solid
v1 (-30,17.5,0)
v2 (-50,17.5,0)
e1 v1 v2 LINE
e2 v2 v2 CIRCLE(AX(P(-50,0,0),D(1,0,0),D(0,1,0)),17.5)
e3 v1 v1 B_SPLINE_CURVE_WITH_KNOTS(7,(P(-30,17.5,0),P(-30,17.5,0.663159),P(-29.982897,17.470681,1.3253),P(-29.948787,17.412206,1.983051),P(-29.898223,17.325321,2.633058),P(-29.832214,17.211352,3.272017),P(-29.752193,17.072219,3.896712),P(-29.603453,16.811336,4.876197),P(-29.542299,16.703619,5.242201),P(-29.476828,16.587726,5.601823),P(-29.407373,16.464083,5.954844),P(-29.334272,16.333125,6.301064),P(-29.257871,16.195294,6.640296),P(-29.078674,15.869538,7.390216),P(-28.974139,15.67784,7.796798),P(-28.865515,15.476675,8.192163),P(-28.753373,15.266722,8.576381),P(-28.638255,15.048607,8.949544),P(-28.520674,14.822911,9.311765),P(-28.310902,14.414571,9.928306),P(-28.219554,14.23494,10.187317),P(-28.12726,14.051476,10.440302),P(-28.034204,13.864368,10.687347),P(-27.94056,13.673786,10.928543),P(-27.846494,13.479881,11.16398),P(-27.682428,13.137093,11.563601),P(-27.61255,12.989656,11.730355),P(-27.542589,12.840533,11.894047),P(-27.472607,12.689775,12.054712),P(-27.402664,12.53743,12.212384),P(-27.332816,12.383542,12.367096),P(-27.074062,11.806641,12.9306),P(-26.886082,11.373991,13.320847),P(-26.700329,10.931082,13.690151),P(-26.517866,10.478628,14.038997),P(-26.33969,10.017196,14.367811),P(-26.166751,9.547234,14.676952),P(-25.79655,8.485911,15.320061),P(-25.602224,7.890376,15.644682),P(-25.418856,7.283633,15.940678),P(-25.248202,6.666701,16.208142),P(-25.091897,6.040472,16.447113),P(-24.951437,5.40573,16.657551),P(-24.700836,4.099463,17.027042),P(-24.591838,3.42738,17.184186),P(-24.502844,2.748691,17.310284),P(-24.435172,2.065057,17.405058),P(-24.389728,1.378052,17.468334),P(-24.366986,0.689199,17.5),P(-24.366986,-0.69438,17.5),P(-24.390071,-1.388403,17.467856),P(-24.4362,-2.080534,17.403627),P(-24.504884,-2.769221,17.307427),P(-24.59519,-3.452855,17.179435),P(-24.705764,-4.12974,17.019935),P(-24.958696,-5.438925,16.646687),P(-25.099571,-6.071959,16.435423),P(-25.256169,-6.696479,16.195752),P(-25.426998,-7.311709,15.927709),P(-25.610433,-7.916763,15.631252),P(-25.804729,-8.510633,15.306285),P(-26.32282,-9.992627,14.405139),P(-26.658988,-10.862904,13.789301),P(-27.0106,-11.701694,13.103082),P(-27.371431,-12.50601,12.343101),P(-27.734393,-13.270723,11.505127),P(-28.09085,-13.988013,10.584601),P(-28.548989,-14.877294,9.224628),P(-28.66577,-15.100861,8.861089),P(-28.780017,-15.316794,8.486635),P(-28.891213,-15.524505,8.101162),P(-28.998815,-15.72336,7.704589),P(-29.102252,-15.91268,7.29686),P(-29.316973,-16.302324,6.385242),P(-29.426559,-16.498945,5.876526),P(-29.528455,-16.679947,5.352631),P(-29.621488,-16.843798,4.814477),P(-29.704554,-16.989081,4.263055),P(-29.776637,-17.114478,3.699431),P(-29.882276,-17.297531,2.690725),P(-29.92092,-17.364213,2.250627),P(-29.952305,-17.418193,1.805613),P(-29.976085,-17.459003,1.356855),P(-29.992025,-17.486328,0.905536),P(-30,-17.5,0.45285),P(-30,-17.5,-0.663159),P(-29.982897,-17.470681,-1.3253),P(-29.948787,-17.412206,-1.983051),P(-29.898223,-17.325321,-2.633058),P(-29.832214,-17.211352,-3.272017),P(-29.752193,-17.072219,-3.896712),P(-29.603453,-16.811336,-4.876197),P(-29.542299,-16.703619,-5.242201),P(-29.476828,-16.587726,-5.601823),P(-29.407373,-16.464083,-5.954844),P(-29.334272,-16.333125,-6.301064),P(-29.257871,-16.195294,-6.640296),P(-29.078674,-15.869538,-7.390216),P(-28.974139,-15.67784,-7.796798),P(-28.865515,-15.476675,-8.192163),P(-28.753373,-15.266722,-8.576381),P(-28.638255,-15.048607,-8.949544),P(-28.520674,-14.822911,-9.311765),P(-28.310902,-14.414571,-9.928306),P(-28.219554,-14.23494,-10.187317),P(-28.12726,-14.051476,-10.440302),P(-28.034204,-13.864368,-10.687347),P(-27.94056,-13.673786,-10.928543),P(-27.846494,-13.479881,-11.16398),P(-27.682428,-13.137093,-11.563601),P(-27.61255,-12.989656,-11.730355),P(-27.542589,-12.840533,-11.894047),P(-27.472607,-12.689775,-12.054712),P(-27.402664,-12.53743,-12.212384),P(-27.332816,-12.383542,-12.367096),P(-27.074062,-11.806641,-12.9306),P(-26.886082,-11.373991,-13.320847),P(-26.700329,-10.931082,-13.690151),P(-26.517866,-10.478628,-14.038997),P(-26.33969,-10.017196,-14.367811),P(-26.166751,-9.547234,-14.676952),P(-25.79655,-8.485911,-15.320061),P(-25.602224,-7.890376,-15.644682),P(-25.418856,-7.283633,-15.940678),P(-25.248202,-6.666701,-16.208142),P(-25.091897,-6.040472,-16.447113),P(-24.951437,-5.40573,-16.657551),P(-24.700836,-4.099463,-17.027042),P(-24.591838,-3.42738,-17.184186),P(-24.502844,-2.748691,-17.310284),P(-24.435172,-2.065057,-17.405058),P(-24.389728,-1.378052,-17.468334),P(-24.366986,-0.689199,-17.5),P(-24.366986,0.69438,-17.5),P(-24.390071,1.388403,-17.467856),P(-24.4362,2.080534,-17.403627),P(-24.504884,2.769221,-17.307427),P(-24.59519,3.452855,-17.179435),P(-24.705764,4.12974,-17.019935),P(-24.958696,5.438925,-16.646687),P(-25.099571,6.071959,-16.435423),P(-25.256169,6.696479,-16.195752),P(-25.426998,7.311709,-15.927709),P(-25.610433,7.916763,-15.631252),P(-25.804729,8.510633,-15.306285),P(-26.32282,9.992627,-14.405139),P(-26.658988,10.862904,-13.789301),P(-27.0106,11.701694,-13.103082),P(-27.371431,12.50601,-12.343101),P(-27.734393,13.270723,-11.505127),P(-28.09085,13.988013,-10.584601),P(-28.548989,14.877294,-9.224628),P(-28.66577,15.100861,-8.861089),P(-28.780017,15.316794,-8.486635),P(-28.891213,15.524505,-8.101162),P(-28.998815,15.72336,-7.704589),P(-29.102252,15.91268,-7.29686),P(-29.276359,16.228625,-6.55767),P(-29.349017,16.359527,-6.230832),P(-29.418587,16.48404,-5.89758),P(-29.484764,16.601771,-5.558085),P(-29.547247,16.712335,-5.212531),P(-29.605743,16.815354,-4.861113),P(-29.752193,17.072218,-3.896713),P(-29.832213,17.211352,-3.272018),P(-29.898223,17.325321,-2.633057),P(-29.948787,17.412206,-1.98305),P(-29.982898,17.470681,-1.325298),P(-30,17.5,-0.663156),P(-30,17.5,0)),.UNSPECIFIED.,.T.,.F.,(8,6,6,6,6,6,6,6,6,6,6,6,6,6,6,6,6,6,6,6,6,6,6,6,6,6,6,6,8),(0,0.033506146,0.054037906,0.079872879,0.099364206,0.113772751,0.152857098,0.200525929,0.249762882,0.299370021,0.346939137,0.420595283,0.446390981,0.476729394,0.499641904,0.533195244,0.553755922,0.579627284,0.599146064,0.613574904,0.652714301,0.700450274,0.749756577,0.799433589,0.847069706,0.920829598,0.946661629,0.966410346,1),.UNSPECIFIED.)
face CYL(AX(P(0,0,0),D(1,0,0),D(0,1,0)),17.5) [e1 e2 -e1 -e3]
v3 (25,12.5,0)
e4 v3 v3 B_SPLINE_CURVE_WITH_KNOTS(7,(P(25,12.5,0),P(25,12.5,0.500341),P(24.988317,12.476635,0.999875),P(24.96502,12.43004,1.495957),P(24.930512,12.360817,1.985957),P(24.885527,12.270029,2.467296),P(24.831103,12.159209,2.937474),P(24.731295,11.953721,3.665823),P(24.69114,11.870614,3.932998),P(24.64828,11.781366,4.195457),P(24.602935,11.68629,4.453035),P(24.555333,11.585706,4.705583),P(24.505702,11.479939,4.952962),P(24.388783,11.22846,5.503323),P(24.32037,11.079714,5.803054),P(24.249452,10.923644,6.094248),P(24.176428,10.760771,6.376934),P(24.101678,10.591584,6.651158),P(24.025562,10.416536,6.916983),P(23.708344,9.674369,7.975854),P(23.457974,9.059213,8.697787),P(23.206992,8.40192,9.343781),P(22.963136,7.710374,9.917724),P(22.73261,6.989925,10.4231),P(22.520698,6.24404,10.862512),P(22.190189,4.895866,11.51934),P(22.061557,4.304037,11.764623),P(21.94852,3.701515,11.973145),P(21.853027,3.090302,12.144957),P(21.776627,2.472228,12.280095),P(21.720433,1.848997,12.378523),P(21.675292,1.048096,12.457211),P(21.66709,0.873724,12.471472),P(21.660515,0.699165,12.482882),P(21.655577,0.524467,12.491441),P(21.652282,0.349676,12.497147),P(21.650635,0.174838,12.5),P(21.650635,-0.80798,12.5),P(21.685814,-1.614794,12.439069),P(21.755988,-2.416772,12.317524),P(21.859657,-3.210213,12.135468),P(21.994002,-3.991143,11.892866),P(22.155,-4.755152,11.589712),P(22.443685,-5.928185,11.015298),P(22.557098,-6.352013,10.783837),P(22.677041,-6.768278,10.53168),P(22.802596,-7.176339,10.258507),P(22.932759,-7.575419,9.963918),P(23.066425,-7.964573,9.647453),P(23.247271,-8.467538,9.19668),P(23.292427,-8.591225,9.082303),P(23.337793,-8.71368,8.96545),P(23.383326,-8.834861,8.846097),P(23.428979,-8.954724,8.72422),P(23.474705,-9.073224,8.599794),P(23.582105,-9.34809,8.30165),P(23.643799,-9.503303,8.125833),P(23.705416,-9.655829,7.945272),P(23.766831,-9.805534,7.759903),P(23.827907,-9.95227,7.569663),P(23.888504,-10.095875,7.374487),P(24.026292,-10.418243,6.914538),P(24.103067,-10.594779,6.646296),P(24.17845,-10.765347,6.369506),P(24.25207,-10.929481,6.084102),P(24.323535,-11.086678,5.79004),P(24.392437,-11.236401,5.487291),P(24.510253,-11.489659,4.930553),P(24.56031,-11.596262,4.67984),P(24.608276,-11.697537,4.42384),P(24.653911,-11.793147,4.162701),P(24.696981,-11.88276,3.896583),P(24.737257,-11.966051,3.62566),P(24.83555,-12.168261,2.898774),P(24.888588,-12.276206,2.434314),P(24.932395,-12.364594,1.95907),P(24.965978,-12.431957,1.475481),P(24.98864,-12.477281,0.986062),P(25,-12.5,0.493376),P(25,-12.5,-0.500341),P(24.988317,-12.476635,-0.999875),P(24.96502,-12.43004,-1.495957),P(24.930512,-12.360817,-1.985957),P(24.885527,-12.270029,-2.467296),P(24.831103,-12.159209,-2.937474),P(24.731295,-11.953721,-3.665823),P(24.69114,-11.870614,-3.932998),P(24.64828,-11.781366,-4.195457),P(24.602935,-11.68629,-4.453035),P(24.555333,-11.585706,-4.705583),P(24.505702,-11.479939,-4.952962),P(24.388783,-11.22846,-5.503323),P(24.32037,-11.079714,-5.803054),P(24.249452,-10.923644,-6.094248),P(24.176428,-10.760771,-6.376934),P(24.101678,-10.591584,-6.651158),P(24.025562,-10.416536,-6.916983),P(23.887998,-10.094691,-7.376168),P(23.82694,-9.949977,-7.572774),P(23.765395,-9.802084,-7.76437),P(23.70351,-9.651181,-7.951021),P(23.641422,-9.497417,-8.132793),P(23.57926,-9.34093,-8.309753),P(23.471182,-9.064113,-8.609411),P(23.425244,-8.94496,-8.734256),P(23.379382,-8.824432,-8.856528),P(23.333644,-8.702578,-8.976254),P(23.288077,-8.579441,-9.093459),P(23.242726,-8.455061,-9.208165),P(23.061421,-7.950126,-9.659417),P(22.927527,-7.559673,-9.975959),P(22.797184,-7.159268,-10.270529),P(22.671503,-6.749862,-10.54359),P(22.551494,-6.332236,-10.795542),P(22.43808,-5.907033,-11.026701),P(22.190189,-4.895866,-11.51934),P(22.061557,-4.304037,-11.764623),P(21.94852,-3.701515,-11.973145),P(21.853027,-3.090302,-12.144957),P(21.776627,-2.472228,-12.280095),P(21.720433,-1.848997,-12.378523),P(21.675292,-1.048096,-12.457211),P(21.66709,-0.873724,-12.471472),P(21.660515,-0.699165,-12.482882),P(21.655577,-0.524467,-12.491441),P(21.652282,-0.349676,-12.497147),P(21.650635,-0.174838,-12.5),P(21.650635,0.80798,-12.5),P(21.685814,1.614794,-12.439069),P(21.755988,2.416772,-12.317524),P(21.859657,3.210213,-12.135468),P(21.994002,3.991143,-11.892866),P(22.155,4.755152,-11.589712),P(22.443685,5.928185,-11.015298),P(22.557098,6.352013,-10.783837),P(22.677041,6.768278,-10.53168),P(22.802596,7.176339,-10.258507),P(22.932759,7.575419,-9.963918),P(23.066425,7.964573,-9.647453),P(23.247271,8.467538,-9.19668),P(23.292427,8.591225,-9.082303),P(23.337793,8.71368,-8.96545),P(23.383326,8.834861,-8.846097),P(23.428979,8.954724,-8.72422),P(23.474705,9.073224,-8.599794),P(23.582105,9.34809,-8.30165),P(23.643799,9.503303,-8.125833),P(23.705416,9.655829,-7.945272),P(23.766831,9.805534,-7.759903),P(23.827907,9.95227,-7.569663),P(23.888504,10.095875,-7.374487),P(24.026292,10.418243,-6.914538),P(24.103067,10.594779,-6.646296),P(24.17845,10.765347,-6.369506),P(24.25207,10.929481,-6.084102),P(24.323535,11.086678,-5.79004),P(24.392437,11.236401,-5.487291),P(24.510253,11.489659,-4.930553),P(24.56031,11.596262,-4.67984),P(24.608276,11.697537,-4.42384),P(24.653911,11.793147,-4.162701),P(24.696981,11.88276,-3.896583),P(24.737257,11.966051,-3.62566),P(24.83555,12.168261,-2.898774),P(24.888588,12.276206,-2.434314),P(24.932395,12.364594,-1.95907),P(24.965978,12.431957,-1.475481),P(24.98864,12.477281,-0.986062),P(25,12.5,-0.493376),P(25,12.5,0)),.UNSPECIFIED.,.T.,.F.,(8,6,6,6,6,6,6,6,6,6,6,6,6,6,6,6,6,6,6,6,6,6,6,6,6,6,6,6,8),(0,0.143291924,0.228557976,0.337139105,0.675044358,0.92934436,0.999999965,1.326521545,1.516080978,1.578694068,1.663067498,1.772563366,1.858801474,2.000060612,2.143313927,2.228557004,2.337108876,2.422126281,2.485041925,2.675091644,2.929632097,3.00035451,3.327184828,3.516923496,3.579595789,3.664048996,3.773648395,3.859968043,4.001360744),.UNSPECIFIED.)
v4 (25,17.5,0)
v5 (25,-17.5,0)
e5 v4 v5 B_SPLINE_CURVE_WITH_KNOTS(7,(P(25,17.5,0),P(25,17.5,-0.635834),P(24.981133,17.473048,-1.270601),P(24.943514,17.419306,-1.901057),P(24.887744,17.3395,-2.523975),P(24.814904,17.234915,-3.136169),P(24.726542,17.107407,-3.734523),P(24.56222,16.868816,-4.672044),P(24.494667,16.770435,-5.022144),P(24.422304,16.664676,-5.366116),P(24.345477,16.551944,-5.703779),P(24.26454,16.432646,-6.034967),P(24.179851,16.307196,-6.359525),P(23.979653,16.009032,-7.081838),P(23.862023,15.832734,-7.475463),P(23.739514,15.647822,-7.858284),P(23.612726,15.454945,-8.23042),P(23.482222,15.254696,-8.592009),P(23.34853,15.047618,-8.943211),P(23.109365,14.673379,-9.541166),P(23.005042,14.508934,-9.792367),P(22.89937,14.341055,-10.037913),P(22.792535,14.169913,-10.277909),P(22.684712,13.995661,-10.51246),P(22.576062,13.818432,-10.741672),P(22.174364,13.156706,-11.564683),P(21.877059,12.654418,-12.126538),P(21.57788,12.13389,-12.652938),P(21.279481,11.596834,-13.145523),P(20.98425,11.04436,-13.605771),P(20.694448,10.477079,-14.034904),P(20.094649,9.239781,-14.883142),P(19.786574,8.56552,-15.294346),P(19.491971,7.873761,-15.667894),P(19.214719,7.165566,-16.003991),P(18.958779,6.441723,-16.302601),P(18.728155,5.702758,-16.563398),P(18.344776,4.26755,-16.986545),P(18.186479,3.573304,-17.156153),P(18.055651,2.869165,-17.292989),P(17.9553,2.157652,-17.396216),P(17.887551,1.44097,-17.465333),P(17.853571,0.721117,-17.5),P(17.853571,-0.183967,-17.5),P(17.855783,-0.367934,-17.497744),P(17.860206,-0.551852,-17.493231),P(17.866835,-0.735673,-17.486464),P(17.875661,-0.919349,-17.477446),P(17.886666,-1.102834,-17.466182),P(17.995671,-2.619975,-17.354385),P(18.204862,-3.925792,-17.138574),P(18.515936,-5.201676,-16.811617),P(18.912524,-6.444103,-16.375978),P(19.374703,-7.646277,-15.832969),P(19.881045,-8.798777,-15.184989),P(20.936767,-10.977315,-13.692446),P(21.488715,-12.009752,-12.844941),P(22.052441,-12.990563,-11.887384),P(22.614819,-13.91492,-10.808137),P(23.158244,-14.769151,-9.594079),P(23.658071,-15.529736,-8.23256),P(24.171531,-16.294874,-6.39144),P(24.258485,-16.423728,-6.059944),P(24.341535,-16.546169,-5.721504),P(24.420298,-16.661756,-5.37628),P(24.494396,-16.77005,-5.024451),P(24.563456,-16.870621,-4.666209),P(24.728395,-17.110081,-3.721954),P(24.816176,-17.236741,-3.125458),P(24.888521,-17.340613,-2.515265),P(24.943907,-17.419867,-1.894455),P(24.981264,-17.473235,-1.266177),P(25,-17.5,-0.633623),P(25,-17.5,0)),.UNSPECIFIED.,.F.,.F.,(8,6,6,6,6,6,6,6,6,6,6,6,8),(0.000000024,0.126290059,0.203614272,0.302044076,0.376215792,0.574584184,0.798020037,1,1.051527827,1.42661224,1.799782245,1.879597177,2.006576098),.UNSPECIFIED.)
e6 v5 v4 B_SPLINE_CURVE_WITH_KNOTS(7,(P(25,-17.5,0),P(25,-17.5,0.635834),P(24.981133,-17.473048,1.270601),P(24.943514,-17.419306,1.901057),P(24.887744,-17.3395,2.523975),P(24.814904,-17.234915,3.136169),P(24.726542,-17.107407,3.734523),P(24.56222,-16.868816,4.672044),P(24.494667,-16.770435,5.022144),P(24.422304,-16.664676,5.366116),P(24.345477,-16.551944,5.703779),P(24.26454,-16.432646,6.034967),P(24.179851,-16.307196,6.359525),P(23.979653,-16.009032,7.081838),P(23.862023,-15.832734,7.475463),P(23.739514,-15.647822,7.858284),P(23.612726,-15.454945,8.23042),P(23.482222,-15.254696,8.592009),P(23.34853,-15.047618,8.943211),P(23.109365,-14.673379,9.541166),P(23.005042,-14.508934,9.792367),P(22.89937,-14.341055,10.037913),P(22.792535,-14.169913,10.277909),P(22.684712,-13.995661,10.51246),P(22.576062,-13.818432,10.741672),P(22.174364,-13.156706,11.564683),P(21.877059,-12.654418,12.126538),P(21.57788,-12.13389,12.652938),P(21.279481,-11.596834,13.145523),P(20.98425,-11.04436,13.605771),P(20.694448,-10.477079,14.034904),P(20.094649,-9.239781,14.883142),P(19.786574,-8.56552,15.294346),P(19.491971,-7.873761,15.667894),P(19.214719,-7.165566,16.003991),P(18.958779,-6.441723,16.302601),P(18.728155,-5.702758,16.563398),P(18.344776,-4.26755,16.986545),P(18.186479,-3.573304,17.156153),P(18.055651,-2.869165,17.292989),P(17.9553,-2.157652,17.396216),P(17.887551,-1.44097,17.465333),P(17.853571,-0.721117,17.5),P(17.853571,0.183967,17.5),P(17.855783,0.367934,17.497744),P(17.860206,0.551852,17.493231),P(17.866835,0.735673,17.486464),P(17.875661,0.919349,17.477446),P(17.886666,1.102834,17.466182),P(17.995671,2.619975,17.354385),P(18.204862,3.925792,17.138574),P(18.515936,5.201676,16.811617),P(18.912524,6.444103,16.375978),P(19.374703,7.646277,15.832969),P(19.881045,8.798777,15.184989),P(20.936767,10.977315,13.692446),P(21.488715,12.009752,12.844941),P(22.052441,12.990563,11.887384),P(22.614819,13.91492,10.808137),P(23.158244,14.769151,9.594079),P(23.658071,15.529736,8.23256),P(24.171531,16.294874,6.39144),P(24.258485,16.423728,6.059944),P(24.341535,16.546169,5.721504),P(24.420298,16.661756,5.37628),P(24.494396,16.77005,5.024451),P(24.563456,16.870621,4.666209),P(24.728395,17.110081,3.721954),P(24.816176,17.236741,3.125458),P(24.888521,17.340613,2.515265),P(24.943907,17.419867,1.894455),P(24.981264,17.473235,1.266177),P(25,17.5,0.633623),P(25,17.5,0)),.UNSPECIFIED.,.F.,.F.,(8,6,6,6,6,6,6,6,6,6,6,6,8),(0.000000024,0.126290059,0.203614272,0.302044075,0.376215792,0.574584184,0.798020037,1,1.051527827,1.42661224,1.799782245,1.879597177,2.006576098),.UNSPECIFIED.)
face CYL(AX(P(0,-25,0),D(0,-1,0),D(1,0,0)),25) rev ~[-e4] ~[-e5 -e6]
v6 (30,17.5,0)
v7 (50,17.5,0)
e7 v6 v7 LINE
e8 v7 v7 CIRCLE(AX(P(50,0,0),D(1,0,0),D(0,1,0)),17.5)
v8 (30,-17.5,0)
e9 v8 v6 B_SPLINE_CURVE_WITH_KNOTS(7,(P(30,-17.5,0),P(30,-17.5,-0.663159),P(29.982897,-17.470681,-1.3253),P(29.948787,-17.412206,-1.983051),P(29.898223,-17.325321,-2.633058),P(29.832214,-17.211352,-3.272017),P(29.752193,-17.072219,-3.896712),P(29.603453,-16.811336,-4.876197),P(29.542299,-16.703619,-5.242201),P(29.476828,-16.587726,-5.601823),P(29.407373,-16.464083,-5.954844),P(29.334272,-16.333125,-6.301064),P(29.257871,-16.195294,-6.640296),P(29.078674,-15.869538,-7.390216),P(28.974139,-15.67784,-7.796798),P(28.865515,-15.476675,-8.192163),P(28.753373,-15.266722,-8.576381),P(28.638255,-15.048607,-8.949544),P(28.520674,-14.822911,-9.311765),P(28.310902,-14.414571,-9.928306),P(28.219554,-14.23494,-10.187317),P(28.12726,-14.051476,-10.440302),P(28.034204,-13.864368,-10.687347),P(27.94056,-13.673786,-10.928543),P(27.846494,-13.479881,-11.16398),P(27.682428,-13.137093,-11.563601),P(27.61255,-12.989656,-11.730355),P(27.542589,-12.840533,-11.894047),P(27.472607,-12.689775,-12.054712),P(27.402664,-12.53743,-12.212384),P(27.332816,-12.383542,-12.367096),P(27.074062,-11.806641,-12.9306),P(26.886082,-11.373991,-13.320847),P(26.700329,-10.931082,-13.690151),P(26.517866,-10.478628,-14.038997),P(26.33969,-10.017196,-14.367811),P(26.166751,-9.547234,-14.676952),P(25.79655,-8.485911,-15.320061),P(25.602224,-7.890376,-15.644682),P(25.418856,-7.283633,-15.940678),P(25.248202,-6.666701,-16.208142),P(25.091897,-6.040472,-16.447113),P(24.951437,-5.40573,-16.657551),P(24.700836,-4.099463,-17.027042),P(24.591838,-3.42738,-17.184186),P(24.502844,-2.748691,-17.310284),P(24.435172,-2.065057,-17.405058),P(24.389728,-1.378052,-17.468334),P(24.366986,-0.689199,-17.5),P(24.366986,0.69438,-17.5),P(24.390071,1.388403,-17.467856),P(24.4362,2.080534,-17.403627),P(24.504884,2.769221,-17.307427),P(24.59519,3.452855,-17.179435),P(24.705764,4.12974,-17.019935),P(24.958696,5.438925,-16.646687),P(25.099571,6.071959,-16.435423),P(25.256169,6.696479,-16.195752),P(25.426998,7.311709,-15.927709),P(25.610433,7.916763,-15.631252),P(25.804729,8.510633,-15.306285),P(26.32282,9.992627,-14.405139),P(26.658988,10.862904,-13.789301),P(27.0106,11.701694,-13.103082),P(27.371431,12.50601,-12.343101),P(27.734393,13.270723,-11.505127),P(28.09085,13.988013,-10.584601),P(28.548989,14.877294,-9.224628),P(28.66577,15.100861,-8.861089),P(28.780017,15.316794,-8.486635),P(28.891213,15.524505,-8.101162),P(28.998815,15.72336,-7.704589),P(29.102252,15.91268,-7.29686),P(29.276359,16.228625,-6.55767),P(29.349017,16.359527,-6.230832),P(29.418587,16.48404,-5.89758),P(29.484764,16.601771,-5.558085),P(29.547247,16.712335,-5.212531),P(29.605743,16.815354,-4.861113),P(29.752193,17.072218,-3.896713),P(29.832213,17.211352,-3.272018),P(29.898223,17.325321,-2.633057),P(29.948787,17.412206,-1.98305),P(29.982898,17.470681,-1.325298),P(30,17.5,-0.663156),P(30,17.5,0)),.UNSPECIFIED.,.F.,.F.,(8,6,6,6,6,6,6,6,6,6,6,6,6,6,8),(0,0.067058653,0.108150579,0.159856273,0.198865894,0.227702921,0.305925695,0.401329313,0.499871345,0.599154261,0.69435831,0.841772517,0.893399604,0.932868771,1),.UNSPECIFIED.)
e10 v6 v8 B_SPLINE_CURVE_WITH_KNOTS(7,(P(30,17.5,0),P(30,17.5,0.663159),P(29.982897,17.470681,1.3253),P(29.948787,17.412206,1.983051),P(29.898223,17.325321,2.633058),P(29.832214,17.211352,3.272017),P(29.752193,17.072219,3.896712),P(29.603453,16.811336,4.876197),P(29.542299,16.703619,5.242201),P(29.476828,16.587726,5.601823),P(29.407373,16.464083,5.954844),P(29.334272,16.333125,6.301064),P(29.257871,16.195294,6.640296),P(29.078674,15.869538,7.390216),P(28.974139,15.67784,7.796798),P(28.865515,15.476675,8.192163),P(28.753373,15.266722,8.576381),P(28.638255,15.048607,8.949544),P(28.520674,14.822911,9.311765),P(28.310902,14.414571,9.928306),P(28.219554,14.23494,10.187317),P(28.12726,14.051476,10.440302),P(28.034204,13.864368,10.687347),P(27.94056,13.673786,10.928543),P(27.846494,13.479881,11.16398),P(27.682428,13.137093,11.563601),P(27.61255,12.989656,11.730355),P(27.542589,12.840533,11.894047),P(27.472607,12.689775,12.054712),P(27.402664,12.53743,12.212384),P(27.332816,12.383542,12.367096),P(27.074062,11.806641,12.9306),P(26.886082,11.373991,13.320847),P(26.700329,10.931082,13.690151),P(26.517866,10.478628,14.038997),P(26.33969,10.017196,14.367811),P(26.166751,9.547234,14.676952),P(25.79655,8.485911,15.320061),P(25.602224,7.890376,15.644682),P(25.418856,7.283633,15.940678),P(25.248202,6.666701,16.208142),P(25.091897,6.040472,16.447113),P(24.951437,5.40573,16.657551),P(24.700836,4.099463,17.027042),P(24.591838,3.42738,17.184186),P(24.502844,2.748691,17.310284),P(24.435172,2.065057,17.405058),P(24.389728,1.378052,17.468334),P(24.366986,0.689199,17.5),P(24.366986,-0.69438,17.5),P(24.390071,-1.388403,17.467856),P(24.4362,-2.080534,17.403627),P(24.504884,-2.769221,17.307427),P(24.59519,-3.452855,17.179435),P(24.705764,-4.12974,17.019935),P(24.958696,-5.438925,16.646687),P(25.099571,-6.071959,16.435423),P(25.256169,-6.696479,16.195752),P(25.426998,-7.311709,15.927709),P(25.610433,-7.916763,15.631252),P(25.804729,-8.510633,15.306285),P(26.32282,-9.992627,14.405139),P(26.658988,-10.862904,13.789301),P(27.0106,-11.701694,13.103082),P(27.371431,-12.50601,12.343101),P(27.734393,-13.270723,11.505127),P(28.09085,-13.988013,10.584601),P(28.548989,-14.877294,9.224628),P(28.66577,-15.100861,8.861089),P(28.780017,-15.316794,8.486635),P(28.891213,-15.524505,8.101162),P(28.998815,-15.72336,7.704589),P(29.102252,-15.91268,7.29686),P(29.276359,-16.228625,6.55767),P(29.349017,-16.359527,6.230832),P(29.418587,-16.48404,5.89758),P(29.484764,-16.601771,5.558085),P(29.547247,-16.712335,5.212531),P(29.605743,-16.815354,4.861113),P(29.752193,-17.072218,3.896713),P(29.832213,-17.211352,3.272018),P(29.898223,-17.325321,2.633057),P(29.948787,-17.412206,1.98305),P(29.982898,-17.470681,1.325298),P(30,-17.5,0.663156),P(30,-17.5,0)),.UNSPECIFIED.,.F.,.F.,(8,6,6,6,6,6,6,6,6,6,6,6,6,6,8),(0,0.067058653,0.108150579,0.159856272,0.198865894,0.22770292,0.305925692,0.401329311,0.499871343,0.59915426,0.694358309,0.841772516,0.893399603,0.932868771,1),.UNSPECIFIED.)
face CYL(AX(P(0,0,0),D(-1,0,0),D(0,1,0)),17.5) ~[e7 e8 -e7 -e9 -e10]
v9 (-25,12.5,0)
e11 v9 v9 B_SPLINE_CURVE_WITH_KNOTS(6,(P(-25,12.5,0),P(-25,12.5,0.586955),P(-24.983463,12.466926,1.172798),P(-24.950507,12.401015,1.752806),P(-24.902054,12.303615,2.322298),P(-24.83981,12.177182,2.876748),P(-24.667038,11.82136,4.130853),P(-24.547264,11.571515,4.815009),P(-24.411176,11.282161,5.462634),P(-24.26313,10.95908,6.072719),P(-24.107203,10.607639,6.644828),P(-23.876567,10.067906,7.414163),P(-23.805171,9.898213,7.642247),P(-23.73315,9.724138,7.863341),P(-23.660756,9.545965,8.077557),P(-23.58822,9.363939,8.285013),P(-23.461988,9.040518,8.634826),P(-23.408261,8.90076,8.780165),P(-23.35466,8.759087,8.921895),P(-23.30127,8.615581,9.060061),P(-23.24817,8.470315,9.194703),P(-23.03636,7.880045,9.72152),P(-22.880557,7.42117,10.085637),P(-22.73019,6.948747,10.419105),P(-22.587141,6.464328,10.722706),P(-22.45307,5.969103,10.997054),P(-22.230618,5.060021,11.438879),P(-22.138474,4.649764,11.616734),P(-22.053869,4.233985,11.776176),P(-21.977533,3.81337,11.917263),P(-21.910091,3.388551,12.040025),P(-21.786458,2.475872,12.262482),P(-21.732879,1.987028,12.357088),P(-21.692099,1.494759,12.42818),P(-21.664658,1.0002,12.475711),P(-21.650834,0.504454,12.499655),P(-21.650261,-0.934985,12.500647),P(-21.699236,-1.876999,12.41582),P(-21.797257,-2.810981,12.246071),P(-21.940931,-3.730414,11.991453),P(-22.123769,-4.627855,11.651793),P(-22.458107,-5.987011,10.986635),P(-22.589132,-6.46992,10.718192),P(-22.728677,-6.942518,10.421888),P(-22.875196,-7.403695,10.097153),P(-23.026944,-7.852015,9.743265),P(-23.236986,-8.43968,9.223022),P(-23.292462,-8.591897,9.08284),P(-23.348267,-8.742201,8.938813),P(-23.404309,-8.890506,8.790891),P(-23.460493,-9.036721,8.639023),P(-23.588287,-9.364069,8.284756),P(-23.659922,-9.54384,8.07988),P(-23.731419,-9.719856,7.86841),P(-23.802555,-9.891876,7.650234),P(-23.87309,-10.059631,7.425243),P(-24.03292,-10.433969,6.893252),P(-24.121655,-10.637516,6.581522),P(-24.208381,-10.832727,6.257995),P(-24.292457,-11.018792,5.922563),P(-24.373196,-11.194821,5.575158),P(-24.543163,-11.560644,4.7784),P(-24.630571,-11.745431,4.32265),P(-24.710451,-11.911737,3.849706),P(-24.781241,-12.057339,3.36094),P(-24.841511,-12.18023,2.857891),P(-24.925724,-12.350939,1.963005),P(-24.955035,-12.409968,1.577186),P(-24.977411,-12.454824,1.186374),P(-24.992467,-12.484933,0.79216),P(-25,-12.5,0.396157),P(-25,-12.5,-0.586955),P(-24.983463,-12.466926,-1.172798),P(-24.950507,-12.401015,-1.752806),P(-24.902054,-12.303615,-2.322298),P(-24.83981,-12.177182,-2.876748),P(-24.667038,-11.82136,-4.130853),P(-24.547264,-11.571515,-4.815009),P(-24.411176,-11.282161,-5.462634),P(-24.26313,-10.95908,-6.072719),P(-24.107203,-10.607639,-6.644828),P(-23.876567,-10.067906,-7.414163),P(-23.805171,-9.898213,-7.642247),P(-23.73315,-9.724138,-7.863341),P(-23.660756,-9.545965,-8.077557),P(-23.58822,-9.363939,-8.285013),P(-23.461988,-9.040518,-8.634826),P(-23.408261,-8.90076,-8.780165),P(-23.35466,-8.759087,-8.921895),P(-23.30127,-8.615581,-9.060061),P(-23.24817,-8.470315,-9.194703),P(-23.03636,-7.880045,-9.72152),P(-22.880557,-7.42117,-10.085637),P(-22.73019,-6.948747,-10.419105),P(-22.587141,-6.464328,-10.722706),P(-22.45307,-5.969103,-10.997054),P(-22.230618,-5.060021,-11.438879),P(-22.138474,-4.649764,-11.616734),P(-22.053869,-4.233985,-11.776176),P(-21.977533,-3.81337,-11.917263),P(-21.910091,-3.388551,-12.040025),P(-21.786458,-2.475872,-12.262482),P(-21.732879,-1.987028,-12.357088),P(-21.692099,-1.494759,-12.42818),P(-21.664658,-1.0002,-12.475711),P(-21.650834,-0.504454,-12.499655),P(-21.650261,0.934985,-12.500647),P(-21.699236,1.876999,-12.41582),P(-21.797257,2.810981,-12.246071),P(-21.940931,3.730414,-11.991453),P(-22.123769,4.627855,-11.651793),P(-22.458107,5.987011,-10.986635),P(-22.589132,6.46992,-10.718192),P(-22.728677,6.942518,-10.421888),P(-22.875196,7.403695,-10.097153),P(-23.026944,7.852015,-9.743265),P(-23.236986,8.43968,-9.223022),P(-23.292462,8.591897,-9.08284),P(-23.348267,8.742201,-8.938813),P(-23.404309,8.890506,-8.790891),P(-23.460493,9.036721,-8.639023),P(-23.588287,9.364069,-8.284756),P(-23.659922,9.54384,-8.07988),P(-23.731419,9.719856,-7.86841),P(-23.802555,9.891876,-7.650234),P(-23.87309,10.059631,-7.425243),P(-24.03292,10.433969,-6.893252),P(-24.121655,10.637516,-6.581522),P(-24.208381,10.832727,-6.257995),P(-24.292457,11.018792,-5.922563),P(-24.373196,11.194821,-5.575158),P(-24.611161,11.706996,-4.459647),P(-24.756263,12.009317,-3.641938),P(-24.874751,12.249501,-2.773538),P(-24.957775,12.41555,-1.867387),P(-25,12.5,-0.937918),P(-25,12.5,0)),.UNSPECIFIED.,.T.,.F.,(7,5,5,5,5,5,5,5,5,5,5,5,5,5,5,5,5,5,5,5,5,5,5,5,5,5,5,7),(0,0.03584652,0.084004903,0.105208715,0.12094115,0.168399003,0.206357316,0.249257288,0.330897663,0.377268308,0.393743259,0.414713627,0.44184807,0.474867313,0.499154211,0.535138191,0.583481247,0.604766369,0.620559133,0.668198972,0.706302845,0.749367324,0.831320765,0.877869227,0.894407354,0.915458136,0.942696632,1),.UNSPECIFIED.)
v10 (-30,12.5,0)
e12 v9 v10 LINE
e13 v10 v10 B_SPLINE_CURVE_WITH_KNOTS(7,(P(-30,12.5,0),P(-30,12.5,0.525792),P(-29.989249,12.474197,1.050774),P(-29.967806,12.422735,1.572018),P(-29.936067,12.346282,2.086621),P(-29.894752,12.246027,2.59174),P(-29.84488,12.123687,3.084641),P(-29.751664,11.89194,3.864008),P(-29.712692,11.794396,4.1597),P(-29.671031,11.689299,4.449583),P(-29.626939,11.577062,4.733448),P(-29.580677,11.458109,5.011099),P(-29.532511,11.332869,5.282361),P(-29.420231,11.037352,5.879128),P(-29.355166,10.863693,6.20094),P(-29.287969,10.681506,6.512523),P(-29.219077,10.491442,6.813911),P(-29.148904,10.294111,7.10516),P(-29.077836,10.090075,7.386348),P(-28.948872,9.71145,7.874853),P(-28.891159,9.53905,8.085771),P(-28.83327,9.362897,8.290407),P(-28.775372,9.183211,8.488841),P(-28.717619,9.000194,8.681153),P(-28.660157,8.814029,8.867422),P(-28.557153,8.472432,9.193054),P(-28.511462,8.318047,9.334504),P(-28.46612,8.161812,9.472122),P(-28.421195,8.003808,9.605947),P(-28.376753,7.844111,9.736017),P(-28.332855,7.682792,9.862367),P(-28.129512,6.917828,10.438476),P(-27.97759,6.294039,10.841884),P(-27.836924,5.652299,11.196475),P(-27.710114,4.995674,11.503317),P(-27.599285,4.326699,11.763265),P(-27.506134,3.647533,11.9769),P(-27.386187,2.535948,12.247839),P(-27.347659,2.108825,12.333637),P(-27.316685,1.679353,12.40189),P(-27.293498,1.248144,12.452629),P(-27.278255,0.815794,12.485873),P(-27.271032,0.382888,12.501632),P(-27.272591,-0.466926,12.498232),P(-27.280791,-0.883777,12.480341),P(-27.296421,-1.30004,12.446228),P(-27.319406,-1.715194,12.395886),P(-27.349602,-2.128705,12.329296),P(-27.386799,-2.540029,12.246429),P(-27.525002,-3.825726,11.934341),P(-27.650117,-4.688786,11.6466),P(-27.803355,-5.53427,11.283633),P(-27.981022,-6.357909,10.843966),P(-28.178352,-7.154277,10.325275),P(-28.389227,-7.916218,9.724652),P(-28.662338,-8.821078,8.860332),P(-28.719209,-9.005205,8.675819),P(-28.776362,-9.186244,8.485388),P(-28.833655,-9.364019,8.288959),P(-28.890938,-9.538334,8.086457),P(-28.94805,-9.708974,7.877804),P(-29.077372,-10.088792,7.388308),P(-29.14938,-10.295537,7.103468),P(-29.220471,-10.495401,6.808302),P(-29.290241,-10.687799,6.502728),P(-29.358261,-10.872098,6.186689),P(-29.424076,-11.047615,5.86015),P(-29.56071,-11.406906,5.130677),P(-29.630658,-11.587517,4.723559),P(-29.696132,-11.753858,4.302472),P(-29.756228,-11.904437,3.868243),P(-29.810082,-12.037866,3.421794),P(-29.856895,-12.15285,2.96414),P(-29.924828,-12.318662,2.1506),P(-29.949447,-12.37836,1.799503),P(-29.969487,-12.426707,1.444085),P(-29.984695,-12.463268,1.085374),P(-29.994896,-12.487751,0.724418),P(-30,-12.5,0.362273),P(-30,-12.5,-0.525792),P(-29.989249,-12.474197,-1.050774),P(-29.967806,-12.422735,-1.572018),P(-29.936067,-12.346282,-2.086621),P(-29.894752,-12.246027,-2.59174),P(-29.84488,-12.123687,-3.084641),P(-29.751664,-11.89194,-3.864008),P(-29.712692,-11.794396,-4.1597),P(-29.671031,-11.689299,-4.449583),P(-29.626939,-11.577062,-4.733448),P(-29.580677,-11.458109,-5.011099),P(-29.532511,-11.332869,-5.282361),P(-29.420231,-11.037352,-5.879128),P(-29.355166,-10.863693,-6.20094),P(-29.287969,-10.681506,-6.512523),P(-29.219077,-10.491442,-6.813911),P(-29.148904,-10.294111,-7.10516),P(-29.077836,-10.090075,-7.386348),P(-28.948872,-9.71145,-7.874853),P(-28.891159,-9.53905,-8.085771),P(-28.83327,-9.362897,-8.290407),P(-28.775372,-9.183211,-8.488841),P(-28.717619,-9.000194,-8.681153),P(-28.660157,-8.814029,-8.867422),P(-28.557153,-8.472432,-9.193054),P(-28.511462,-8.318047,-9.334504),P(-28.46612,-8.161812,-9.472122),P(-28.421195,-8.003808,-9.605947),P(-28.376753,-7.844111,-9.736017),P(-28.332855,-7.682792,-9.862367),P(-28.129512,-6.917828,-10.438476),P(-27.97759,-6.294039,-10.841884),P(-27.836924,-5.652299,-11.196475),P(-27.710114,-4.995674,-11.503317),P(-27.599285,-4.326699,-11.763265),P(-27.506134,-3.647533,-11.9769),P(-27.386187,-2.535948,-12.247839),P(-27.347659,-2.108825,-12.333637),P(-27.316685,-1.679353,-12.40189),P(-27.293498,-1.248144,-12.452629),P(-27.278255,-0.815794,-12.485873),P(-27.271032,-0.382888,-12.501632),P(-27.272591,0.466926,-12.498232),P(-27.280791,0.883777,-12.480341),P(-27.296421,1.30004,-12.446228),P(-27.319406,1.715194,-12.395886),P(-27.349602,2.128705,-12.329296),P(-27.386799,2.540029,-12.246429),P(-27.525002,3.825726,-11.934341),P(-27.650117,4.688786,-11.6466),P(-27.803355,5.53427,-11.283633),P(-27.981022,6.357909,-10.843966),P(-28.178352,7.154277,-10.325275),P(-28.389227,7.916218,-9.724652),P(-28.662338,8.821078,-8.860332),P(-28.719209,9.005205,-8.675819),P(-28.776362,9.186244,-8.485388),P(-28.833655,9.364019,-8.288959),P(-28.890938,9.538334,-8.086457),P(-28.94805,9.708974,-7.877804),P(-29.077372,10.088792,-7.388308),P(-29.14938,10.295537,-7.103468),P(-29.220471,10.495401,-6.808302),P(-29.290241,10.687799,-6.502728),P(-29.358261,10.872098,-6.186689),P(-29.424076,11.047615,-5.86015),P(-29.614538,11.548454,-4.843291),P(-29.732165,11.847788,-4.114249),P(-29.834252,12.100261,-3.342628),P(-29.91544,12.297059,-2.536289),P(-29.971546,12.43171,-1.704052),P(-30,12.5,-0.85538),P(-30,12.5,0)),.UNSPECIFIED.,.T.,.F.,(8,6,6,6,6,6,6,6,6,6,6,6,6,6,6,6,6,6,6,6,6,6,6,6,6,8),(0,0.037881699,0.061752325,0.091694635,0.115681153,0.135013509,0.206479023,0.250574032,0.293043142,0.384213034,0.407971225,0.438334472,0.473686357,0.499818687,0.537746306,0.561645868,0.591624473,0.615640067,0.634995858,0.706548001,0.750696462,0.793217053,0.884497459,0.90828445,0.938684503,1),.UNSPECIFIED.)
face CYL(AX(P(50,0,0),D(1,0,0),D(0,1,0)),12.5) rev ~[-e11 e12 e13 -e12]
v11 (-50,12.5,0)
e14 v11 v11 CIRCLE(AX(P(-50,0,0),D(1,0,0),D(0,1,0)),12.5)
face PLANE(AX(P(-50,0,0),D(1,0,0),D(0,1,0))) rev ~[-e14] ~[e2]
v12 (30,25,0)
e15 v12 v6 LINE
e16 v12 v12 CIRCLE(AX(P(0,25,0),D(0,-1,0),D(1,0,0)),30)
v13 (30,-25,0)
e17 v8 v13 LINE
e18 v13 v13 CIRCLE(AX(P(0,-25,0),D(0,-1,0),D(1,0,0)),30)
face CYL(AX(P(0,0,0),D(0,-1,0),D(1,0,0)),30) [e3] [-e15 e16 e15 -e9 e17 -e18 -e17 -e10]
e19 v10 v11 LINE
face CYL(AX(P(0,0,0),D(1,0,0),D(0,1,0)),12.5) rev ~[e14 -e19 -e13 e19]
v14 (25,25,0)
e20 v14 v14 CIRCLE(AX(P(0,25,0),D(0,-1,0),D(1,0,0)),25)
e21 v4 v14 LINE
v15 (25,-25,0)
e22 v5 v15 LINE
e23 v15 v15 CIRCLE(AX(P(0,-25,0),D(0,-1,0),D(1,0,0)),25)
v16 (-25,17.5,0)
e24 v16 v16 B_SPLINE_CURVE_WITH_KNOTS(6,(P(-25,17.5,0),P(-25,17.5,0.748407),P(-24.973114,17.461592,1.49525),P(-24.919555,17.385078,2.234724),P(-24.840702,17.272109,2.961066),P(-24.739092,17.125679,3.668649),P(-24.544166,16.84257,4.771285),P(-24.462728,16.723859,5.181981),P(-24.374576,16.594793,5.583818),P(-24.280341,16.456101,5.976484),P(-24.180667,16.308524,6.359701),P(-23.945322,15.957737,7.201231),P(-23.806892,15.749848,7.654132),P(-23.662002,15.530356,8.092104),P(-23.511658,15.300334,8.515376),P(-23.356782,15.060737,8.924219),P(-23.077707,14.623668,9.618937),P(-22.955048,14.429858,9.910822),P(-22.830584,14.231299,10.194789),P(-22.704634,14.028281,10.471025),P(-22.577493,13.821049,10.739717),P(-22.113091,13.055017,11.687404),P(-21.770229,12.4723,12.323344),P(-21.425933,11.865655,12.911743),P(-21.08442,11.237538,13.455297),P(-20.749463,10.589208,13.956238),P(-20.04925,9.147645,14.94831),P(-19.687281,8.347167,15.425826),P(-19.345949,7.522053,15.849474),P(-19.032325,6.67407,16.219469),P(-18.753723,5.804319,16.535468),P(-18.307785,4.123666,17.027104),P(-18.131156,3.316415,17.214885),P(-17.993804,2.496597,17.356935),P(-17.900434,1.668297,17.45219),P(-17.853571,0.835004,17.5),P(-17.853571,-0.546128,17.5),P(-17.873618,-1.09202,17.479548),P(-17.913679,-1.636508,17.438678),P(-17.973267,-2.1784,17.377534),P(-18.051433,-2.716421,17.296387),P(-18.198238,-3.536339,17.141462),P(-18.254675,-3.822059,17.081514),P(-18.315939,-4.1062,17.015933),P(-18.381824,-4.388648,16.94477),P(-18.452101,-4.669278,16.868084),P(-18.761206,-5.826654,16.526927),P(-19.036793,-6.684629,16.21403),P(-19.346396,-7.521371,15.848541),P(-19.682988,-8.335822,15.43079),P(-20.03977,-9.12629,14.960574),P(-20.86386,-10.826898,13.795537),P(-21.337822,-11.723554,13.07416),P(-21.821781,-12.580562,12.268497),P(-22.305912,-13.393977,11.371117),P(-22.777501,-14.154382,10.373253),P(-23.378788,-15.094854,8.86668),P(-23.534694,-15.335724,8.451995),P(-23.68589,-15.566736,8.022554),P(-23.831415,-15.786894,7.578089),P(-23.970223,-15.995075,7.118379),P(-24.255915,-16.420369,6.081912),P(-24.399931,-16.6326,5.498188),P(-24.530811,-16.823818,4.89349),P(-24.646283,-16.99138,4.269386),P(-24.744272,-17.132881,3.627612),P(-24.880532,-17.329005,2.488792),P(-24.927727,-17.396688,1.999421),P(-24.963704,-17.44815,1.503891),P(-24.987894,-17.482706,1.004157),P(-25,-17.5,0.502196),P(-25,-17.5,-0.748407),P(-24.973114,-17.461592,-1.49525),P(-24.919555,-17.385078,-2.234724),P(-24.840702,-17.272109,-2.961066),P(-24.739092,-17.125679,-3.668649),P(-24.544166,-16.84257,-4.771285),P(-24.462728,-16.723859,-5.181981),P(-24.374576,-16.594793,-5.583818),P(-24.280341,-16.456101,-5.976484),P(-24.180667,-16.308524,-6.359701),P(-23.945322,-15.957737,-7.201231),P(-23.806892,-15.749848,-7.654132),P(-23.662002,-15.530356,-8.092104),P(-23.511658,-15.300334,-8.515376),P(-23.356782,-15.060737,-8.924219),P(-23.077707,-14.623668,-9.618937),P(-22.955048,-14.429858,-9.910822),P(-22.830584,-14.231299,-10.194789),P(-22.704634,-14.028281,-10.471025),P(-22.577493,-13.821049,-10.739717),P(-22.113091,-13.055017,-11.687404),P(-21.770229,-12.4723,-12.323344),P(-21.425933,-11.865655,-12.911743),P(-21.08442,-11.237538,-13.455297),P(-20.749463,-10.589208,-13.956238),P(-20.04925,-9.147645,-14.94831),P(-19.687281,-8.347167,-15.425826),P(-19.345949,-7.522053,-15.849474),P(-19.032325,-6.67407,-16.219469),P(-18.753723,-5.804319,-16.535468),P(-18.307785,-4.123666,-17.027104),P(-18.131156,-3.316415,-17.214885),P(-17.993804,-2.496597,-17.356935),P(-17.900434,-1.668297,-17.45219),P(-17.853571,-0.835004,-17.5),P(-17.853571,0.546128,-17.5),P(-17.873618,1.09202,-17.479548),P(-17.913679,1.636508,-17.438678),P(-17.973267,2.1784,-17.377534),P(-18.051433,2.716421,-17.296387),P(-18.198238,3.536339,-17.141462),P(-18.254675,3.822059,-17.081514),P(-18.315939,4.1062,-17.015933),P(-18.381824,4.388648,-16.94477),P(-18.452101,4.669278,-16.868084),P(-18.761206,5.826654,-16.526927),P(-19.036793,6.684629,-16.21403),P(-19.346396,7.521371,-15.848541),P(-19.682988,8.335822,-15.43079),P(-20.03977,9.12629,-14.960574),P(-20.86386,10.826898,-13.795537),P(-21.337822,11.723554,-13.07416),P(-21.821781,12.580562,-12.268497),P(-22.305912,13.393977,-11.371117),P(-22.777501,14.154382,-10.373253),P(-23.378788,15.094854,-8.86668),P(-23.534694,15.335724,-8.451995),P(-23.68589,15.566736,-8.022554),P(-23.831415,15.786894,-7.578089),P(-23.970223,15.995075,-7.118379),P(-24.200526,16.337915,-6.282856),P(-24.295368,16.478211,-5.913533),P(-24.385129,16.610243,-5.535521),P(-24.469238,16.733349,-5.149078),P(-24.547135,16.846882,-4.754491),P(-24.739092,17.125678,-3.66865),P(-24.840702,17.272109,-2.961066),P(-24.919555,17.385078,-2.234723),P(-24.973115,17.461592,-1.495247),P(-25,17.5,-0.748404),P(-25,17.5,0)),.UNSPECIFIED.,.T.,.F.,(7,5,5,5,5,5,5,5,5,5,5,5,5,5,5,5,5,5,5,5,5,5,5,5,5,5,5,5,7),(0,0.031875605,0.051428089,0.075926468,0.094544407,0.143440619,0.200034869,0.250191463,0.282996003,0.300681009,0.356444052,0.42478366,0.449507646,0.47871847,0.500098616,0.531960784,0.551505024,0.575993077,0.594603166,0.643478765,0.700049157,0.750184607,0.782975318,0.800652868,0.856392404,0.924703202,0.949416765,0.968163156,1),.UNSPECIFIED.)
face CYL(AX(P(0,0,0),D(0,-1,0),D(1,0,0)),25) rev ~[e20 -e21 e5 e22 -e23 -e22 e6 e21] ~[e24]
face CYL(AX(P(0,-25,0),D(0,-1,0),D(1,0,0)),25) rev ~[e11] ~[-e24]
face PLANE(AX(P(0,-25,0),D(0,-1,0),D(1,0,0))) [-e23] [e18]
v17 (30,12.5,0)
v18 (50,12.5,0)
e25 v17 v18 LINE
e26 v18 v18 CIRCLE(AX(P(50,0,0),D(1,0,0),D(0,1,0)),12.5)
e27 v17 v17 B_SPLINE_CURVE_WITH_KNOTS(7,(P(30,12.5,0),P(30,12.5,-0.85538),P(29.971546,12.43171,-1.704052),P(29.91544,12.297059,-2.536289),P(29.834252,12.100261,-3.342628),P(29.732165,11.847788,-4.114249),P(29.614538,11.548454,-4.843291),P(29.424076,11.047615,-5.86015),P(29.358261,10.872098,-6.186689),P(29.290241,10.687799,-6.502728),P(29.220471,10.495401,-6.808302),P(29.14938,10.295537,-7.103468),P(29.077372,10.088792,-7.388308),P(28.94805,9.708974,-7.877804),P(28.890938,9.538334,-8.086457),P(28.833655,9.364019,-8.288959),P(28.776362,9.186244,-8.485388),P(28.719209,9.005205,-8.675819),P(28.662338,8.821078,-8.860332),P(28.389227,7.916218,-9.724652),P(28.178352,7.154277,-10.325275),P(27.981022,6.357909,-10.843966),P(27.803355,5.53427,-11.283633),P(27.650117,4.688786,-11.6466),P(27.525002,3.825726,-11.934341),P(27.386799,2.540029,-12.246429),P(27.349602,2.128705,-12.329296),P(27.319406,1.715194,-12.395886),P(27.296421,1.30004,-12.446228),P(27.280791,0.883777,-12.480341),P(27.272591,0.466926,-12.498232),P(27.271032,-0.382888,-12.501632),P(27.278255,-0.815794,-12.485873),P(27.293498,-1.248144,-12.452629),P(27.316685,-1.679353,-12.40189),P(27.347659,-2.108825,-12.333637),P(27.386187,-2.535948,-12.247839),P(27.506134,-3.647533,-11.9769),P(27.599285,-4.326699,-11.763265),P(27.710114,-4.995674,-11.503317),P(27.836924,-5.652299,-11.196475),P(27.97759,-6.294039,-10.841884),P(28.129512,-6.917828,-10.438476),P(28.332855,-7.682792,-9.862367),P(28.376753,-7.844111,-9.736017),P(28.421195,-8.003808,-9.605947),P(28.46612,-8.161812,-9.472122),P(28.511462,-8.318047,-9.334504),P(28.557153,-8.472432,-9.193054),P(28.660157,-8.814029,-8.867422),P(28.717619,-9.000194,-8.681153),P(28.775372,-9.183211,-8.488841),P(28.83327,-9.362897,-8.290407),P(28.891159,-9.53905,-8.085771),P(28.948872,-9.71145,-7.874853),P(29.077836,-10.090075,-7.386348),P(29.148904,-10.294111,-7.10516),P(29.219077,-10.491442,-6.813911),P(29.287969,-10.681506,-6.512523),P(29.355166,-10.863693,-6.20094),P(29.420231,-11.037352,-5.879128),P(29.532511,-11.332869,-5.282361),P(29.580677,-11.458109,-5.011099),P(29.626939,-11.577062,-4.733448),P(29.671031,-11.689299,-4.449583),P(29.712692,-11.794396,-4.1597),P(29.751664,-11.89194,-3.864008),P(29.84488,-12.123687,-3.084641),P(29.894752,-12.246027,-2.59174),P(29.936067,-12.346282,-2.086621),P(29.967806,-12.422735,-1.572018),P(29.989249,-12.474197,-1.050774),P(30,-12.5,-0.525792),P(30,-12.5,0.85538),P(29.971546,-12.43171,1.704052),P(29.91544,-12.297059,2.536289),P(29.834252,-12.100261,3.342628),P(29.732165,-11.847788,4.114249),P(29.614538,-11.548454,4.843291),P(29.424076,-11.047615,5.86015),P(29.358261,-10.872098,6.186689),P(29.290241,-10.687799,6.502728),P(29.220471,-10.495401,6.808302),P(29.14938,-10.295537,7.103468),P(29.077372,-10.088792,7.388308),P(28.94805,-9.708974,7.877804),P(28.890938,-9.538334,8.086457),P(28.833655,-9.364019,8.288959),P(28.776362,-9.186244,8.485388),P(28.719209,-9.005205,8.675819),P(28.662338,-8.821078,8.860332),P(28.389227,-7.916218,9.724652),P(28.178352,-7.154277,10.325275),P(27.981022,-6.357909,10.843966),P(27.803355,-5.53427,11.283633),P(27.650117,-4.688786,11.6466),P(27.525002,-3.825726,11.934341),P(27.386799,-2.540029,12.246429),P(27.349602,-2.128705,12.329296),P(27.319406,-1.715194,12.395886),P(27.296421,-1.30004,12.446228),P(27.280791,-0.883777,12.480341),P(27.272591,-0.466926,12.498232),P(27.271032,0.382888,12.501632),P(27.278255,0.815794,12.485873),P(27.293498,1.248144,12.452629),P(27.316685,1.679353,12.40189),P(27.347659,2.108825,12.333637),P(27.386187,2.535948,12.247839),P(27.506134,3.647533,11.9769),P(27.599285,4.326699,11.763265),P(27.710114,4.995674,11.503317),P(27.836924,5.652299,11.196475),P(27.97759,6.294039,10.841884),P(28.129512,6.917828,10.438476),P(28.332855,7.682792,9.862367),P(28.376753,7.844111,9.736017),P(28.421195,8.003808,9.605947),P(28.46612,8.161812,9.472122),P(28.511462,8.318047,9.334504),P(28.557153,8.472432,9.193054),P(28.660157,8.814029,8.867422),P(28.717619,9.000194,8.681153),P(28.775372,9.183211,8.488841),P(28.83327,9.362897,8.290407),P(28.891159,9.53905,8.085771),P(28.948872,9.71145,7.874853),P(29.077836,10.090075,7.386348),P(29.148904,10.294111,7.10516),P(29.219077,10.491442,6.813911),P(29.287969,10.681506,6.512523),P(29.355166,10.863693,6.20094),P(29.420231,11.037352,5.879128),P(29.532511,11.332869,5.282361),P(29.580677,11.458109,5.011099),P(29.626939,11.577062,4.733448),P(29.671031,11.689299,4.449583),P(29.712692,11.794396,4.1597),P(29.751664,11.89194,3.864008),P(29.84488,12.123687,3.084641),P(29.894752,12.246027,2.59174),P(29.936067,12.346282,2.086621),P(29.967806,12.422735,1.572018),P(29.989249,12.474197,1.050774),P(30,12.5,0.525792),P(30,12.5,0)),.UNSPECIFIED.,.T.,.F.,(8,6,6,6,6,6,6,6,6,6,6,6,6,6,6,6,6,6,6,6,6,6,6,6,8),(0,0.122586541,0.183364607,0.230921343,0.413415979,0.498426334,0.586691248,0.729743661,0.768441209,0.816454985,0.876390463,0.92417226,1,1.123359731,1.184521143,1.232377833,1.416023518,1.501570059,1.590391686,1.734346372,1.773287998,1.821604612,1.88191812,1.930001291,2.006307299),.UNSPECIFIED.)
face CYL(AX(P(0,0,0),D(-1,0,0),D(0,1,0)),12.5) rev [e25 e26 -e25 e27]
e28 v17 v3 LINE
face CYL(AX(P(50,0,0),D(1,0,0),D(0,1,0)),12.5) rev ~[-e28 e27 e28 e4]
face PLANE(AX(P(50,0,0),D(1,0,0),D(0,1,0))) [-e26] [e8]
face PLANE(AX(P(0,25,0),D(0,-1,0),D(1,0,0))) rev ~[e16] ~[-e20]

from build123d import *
from build123d import SkipClean  # not in build123d's __all__

# Parameters (mm, degrees)
F0_R          = 30
F0_R_2        = 25
F1_DEPTH      = 25
F1_DEPTH_BACK = 25
F2_R          = 17.5
F2_R_2        = 12.5
F3_DEPTH      = 50
F3_DEPTH_BACK = 50
F4_R          = 25
F5_DEPTH      = 50
F6_R          = 12.5
F7_DEPTH      = 100.0010001


with BuildPart() as f1:
    # F0 (on Front) → F1 (new body, two sides)
    with BuildSketch(Plane.XZ) as f1_sk:
        Circle(F0_R)
        Circle(F0_R_2, mode=Mode.SUBTRACT)
    extrude(amount=F1_DEPTH)
    extrude(f1_sk.sketch, amount=-F1_DEPTH_BACK)

    # F2 (on Right) → F3 (join, two sides)
    with BuildSketch(Plane.YZ) as f3_sk:
        Circle(F2_R)
        Circle(F2_R_2, mode=Mode.SUBTRACT)
    extrude(amount=F3_DEPTH)
    extrude(f3_sk.sketch, amount=-F3_DEPTH_BACK)

    # F4 (on face) → F5 (cut, through all)
    with BuildSketch(Plane.XZ.offset(25)):
        Circle(F4_R)
    extrude(amount=-F5_DEPTH, mode=Mode.SUBTRACT)

    # F6 (on face) → F7 (cut, through all)
    with BuildSketch(Plane.YZ.offset(50)):
        Circle(F6_R)
    with SkipClean():  # cleaning this boolean's faces spoils the solid; the shape is the same uncleaned
        extrude(amount=-F7_DEPTH, mode=Mode.SUBTRACT)


solid = f1.part
